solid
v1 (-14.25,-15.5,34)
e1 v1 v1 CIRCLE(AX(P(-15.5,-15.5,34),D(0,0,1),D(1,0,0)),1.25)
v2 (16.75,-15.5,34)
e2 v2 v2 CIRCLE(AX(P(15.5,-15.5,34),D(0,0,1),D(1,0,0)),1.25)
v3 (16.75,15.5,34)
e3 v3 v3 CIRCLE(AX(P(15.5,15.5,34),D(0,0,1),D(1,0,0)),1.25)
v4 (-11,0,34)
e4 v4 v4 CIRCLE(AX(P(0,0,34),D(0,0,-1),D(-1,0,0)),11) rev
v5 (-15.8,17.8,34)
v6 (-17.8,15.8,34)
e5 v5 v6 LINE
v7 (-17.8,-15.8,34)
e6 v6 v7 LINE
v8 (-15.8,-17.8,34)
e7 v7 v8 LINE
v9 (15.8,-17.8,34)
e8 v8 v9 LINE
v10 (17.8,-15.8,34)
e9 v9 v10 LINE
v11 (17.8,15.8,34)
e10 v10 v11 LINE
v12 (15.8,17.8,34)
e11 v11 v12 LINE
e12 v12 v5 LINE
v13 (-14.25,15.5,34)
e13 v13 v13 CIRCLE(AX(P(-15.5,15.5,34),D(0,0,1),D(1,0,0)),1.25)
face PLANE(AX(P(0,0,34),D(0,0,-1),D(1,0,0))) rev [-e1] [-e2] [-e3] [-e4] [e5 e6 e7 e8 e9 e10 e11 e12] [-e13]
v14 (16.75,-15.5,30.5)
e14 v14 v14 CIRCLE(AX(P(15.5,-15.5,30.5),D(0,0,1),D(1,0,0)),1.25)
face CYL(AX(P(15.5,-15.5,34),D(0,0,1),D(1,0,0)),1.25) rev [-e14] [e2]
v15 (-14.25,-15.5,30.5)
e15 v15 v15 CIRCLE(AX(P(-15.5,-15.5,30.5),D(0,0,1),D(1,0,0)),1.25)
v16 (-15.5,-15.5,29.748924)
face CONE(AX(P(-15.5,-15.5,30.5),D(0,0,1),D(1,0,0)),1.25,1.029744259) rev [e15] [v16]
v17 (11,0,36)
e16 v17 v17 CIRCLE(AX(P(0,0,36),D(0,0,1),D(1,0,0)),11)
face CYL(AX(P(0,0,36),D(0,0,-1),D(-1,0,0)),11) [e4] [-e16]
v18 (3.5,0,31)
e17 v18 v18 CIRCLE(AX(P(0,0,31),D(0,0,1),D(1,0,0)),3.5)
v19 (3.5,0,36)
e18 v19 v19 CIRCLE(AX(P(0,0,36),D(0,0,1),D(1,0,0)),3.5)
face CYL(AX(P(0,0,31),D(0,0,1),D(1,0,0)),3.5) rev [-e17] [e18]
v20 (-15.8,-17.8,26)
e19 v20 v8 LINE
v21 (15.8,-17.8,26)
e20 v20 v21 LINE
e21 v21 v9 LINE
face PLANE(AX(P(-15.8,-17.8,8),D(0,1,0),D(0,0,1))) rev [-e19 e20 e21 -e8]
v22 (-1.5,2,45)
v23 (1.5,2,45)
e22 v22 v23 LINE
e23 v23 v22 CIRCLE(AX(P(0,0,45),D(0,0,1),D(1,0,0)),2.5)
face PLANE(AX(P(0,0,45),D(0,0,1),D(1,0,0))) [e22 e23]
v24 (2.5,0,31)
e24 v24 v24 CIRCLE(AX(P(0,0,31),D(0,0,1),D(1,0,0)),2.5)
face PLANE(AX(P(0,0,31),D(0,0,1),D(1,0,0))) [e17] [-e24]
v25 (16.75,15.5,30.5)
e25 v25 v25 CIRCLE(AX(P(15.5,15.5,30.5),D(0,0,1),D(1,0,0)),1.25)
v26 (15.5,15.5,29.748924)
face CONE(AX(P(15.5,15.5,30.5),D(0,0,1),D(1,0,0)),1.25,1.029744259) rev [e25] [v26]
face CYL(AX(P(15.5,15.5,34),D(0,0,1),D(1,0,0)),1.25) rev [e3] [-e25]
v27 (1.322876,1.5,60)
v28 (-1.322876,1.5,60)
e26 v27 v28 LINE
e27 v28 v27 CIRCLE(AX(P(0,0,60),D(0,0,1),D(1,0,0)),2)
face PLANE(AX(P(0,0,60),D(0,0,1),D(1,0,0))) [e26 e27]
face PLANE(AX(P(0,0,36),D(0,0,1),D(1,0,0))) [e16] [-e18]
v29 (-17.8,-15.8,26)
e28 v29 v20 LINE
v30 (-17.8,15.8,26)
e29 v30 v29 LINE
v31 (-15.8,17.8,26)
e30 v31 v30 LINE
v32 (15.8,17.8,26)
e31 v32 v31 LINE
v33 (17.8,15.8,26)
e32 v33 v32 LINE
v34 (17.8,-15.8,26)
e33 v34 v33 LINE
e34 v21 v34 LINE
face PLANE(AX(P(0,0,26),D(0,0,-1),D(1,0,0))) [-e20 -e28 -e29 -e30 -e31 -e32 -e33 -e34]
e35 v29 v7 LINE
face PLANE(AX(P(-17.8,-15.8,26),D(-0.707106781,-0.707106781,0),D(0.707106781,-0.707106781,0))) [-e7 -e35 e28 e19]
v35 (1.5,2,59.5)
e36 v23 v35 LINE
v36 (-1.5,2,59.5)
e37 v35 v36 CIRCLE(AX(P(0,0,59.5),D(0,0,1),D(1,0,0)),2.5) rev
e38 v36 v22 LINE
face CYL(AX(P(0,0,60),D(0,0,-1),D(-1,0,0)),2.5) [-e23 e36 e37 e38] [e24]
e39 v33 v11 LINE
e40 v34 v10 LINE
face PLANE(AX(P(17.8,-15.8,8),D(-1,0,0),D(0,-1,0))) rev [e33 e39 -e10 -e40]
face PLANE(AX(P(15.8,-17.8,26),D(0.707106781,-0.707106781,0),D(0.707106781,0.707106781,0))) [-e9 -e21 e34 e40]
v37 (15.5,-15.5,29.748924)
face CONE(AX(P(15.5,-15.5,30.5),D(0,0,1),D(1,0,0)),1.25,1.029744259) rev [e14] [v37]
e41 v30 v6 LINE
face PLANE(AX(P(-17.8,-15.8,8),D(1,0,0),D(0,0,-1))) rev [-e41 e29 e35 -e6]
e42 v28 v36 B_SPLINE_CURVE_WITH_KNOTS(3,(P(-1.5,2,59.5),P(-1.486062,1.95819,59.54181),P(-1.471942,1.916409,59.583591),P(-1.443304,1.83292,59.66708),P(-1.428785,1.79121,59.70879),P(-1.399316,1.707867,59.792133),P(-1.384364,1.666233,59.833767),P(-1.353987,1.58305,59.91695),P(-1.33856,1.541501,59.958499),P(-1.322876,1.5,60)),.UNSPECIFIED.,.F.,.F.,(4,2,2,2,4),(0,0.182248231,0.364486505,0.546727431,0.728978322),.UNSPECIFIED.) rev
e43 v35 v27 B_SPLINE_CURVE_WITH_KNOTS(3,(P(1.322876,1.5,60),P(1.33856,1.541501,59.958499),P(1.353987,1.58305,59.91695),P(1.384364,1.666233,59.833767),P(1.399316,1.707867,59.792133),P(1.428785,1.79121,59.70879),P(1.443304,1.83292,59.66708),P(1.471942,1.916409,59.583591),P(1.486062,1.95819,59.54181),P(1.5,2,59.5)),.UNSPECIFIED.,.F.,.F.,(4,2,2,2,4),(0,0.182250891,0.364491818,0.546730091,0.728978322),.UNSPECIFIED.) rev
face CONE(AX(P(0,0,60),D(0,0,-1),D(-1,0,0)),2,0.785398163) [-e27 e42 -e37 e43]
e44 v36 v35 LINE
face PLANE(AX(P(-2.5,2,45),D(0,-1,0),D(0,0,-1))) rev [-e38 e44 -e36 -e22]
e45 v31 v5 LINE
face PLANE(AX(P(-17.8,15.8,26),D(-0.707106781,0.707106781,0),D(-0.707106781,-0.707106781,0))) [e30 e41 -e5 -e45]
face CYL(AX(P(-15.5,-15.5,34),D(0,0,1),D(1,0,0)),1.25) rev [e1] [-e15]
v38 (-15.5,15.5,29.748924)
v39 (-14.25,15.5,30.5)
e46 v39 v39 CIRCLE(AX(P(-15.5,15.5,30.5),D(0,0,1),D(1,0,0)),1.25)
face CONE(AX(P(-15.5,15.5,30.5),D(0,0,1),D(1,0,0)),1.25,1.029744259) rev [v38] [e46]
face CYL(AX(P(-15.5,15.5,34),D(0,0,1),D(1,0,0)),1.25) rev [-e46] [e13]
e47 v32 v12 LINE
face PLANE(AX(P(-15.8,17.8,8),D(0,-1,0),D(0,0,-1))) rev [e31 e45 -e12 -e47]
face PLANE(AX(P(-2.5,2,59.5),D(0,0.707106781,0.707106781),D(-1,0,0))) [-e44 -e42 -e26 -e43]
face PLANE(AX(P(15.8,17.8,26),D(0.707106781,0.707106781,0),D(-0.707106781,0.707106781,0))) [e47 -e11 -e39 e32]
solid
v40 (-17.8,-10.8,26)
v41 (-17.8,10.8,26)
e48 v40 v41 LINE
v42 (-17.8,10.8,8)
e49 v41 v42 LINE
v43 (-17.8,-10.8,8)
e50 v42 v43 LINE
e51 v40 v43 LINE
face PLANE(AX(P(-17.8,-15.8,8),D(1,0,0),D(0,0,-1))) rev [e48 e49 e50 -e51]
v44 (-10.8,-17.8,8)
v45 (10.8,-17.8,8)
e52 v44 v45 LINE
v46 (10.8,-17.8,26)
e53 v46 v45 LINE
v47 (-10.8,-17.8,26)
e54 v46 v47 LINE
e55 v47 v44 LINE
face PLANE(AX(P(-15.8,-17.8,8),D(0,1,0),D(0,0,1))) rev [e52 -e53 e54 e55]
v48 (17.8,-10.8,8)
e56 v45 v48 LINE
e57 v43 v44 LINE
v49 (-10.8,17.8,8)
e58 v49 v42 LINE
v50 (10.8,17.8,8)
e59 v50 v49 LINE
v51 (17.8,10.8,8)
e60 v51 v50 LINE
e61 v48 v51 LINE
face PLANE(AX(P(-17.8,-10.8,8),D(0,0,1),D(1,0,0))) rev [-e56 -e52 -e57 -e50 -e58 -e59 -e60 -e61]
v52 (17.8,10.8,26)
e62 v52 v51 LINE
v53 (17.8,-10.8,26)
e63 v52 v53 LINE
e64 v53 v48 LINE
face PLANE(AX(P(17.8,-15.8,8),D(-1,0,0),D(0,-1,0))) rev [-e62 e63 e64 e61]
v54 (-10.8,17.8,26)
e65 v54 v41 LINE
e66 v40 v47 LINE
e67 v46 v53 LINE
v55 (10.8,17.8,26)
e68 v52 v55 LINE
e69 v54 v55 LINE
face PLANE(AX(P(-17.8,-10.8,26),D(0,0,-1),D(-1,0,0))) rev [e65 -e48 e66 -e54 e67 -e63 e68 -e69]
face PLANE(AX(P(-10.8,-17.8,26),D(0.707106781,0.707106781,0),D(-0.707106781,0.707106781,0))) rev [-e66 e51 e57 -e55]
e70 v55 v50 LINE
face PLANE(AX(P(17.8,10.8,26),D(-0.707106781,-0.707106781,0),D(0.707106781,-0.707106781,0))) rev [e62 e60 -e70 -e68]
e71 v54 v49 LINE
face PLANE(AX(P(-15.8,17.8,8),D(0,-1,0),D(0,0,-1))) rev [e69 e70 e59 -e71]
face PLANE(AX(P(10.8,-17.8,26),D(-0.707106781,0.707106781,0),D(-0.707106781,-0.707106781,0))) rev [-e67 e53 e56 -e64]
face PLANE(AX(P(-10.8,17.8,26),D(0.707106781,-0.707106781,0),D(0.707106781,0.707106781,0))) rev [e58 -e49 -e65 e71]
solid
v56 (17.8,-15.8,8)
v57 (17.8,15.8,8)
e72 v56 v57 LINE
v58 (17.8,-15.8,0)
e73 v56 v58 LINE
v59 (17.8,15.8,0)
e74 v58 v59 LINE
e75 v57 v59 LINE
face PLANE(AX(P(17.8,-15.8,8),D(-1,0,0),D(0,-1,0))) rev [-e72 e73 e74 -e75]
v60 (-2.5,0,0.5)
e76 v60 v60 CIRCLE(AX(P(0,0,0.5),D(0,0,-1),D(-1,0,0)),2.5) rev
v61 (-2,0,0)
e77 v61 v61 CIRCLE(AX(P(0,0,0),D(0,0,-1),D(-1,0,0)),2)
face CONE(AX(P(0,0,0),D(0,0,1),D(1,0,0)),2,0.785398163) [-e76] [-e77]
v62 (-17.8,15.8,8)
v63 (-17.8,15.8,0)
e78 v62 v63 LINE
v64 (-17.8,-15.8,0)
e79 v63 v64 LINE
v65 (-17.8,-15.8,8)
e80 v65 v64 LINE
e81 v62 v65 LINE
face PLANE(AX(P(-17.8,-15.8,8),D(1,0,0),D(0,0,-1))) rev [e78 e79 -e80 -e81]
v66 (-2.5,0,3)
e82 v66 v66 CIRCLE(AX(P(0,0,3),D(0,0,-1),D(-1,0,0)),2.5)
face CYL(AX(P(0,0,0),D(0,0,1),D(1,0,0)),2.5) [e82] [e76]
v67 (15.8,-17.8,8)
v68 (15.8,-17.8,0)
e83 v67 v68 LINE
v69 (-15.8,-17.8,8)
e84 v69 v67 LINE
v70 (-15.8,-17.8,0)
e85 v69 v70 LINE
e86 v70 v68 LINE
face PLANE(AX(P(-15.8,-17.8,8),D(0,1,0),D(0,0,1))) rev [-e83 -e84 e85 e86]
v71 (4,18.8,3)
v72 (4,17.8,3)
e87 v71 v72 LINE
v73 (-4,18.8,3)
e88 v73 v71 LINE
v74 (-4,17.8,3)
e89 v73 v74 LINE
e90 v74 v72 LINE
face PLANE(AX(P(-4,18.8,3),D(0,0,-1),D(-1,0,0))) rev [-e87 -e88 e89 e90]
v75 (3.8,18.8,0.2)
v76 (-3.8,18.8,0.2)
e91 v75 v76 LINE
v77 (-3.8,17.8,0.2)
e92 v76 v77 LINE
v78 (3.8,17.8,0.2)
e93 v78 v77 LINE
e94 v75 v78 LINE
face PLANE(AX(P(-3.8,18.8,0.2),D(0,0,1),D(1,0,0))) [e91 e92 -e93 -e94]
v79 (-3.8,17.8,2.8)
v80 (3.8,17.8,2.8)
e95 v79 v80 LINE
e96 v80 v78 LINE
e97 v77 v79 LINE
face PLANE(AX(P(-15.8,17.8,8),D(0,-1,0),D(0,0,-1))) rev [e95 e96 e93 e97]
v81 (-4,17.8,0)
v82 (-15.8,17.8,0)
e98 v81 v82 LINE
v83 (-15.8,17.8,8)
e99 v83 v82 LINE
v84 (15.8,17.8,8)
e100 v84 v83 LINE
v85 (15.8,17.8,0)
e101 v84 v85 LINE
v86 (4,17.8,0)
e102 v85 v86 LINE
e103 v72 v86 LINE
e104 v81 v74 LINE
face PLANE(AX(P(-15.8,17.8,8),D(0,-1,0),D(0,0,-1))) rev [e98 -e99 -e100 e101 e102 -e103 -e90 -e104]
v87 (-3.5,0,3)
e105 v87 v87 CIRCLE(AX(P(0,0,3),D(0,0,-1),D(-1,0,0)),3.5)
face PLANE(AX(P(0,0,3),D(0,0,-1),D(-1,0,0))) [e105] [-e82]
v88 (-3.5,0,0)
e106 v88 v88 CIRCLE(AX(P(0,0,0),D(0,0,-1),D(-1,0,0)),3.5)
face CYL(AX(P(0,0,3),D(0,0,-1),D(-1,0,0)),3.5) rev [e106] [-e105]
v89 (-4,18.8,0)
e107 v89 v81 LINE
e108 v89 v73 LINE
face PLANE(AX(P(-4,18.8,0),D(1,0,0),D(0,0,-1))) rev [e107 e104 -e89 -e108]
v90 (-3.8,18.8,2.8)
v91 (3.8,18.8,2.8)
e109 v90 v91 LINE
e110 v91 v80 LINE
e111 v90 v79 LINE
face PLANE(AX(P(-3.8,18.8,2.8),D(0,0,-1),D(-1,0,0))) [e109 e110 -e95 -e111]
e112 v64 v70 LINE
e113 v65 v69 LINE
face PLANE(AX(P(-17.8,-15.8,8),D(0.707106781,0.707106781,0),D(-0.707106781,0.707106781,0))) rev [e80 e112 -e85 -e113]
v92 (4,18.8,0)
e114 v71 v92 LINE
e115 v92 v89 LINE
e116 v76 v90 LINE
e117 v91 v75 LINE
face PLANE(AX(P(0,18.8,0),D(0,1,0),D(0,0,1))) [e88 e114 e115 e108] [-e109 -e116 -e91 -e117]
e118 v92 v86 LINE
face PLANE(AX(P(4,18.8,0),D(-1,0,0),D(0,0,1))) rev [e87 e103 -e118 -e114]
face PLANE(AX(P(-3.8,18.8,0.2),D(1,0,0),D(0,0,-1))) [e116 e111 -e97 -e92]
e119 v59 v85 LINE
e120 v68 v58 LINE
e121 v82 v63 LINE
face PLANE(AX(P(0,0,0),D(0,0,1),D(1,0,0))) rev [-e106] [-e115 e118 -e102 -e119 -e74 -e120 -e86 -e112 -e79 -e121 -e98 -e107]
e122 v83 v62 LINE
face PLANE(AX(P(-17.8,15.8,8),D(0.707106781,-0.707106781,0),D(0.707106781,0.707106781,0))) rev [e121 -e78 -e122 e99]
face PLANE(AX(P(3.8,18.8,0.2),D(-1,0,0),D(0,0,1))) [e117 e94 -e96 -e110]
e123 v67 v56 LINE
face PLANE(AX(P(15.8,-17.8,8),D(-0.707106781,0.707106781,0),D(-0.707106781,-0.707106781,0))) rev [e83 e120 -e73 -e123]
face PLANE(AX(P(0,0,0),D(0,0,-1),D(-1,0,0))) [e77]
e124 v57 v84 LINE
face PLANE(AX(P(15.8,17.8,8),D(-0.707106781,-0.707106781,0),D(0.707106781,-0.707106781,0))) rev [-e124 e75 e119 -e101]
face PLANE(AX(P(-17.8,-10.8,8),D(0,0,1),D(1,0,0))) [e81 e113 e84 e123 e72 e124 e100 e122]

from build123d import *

# Parameters (mm, degrees)
BOSS_EXTRUDE1_DEPTH         = 8
BOSS_EXTRUDE2_DEPTH         = 18
TAP_DRILL_FOR_M3_TAP1_D     = 2.5
TAP_DRILL_FOR_M3_TAP1_DEPTH = 3.5
TAP_DRILL_FOR_M3_TAP1_TIP   = 0.751075774
SKETCH6_R                   = 11
BOSS_EXTRUDE3_DEPTH         = 2
SKETCH7_R                   = 3.5
CUT_EXTRUDE1_DEPTH          = 5
SKETCH8_R                   = 2.5
BOSS_EXTRUDE4_DEPTH         = 29
SKETCH9_W                   = 5
SKETCH9_H                   = 2
CUT_EXTRUDE2_DEPTH          = 15
CHAMFER1_SIZE               = 0.5
CUT_EXTRUDE3_START          = -3
SKETCH10_R                  = 3.5
CUT_EXTRUDE3_DEPTH          = 3
BOSS_EXTRUDE5_START         = 3
SKETCH11_R                  = 2.5
BOSS_EXTRUDE5_DEPTH         = 3
CHAMFER2_SIZE               = 0.5
SKETCH12_W                  = 8
SKETCH12_H                  = 3
SKETCH12_W_2                = 7.6
SKETCH12_H_2                = 2.6
BOSS_EXTRUDE6_DEPTH         = 1
SPLIT1_START                = 8
SPLIT1_DEPTH                = 52
SPLIT1_2_DEPTH              = 18
SPLIT1_START_2              = 26
SPLIT1_3_OUTLINE_R          = 3.5
SPLIT1_3_OUTLINE_R_2        = 1.25
SPLIT1_3_OUTLINE_R_3        = 2.5
SPLIT1_3_DEPTH              = 8
SPLIT1_START_3              = 34
SPLIT1_4_OUTLINE_R          = 11
SPLIT1_4_OUTLINE_R_2        = 3.5
SPLIT1_4_OUTLINE_R_3        = 2.5
SPLIT1_4_DEPTH              = 2
SPLIT1_START_4              = 36
SPLIT1_5_DEPTH              = 24
SPLIT1_6_OUTLINE_R          = 1.25
SPLIT1_6_OUTLINE_R_2        = 3.5
SPLIT1_6_OUTLINE_R_3        = 2.5
SPLIT1_6_DEPTH              = 4.4999999
SPLIT1_START_5              = 29.748924126
SPLIT1_7_OUTLINE_R          = 3.5
SPLIT1_7_OUTLINE_R_2        = 2.5
SPLIT1_7_DEPTH              = 1.251075874
SPLIT1_8_DEPTH              = 9
SPLIT1_START_6              = 43.487067043
SPLIT1_10_OUTLINE_W         = 6
SPLIT1_10_OUTLINE_H         = 4
SPLIT1_10_DEPTH             = 1.512932957


with BuildPart() as part:
    # Sketch1 → Boss-Extrude1 (new body)
    with BuildSketch(Plane.XY):
        Polygon((-17.8, 15.8), (-15.8, 17.8), (15.8, 17.8), (17.8, 15.8), (17.8, -15.8), (15.8, -17.8), (-15.8, -17.8), (-17.8, -15.8), align=None)
    boss_extrude1 = extrude(amount=BOSS_EXTRUDE1_DEPTH)

    # Sketch2 → Boss-Extrude2 (add)
    with BuildSketch(Plane.XY.offset(8)):
        Polygon((10.8, -17.8), (-10.8, -17.8), (-17.8, -10.8), (-17.8, 10.8), (-10.8, 17.8), (10.8, 17.8), (17.8, 10.8), (17.8, -10.8), align=None)
    extrude(amount=BOSS_EXTRUDE2_DEPTH)

    # Mirror1: Boss-Extrude1 across plane
    add(boss_extrude1.mirror(Plane.XY.offset(17)))

    # Tap Drill for M3 Tap1
    with Locations(Plane.XY.offset(34)):
        with Locations((-15.5, 15.5), (15.5, 15.5), (15.5, -15.5), (-15.5, -15.5)):
            Hole(TAP_DRILL_FOR_M3_TAP1_D / 2, depth=TAP_DRILL_FOR_M3_TAP1_DEPTH)
            with Locations((0, 0, -(TAP_DRILL_FOR_M3_TAP1_DEPTH + TAP_DRILL_FOR_M3_TAP1_TIP / 2))):  # 118° drill point
                Cone(0, TAP_DRILL_FOR_M3_TAP1_D / 2, TAP_DRILL_FOR_M3_TAP1_TIP, mode=Mode.SUBTRACT)

    # Sketch6 → Boss-Extrude3 (add)
    with BuildSketch(Plane.XY.offset(34)):
        with Locations(Location((0, 0, 0), (0, 0, 180))):
            Circle(SKETCH6_R)
    extrude(amount=BOSS_EXTRUDE3_DEPTH)

    # Sketch7 → Cut-Extrude1 (cut)
    with BuildSketch(Plane.XY.offset(36)):
        Circle(SKETCH7_R)
    extrude(amount=-CUT_EXTRUDE1_DEPTH, mode=Mode.SUBTRACT)

    # Sketch8 → Boss-Extrude4 (add)
    with BuildSketch(Plane.XY.offset(31)):
        with Locations(Location((0, 0, 0), (0, 0, 180))):
            Circle(SKETCH8_R)
    extrude(amount=BOSS_EXTRUDE4_DEPTH)

    # Sketch9 → Cut-Extrude2 (cut)
    with BuildSketch(Plane.XY.offset(60)):
        with Locations((0, 3)):
            Rectangle(SKETCH9_W, SKETCH9_H)
    extrude(amount=-CUT_EXTRUDE2_DEPTH, mode=Mode.SUBTRACT)

    # Chamfer1
    chamfer1_edges = [part.edges().sort_by_distance(p)[0] for p in [
        (1.118033989, -2.236067977, 60),
        (0, 2, 60),
    ]]
    chamfer(chamfer1_edges, length=CHAMFER1_SIZE - 0.0001)  # a hair under: the kernel refuses the full size

    # Sketch10 → Cut-Extrude3 (cut)
    with BuildSketch(Plane(origin=(0, 0, 0), x_dir=(-1, 0, 0), z_dir=(0, 0, -1)).offset(CUT_EXTRUDE3_START)):
        with Locations(Location((0, 0, 0), (0, 0, 180))):
            Circle(SKETCH10_R)
    extrude(amount=CUT_EXTRUDE3_DEPTH, mode=Mode.SUBTRACT)

    # Sketch11 → Boss-Extrude5 (add)
    with BuildSketch(Plane(origin=(0, 0, 3), x_dir=(-1, 0, 0), z_dir=(0, 0, -1)).offset(BOSS_EXTRUDE5_START)):
        with Locations(Location((0, 0, 0), (0, 0, 53.130102354))):
            Circle(SKETCH11_R)
    extrude(amount=-BOSS_EXTRUDE5_DEPTH)

    # Chamfer2
    chamfer2_edges = [part.edges().sort_by_distance(p)[0] for p in [
        (1.5, -2, 0),
    ]]
    chamfer(chamfer2_edges, length=CHAMFER2_SIZE)

    # Sketch12 → Boss-Extrude6 (add)
    with BuildSketch(Plane(origin=(0, 17.8, 0), x_dir=(1, 0, 0), z_dir=(0, 1, 0))):
        with Locations((0, -1.5)):
            Rectangle(SKETCH12_W, SKETCH12_H)
        with Locations((0, -1.5)):
            Rectangle(SKETCH12_W_2, SKETCH12_H_2, mode=Mode.SUBTRACT)
    extrude(amount=BOSS_EXTRUDE6_DEPTH)

    # Split1: read off the stored shape, not the designer's step
    # Split1 outline → Split1 (cut)
    with BuildSketch(Plane.XY.offset(SPLIT1_START)):
        Polygon((-15.8, 17.8), (-17.8, 15.8), (-17.8, -15.8), (-15.8, -17.8), (15.8, -17.8), (17.8, -15.8), (17.8, 15.8), (15.8, 17.8), align=None)
    extrude(amount=SPLIT1_DEPTH, mode=Mode.SUBTRACT)


with BuildPart() as body_2:
    # Split1 2 outline → Split1 2 (new body)
    with BuildSketch(Plane.XY.offset(SPLIT1_START)):
        Polygon((-17.8, 10.8), (-17.8, -10.8), (-10.8, -17.8), (10.8, -17.8), (17.8, -10.8), (17.8, 10.8), (10.8, 17.8), (-10.8, 17.8), align=None)
    extrude(amount=SPLIT1_2_DEPTH)


with BuildPart() as body_3:
    # Split1 3 outline → Split1 3 (new body)
    # profile 1 of 2: a face of its own
    with BuildSketch(Plane.XY.offset(SPLIT1_START_2)):
        Polygon((-15.8, -17.8), (15.8, -17.8), (17.8, -15.8), (17.8, 15.8), (15.8, 17.8), (-15.8, 17.8), (-17.8, 15.8), (-17.8, -15.8), align=None)
        Circle(SPLIT1_3_OUTLINE_R, mode=Mode.SUBTRACT)
        with Locations((-15.5, -15.5)):
            Circle(SPLIT1_3_OUTLINE_R_2, mode=Mode.SUBTRACT)
        with Locations((15.5, -15.5)):
            Circle(SPLIT1_3_OUTLINE_R_2, mode=Mode.SUBTRACT)
        with Locations((-15.5, 15.5)):
            Circle(SPLIT1_3_OUTLINE_R_2, mode=Mode.SUBTRACT)
        with Locations((15.5, 15.5)):
            Circle(SPLIT1_3_OUTLINE_R_2, mode=Mode.SUBTRACT)
    # profile 2 of 2: a face of its own
    with BuildSketch(Plane.XY.offset(SPLIT1_START_2)):
        Circle(SPLIT1_3_OUTLINE_R_3)
    extrude(amount=SPLIT1_3_DEPTH)

    # Split1 4 outline → Split1 4 (add)
    # profile 1 of 2: a face of its own
    with BuildSketch(Plane.XY.offset(SPLIT1_START_3)):
        Circle(SPLIT1_4_OUTLINE_R)
        Circle(SPLIT1_4_OUTLINE_R_2, mode=Mode.SUBTRACT)
    # profile 2 of 2: a face of its own
    with BuildSketch(Plane.XY.offset(SPLIT1_START_3)):
        Circle(SPLIT1_4_OUTLINE_R_3)
    extrude(amount=SPLIT1_4_DEPTH)

    # Split1 5 outline → Split1 5 (add)
    with BuildSketch(Plane.XY.offset(SPLIT1_START_4)):
        with BuildLine():
            Line((1.5, 2), (-1.5, 2))
            ThreePointArc((-1.5, 2), (0, -2.5), (1.5, 2))
        make_face()
    extrude(amount=SPLIT1_5_DEPTH)

    # Split1 6 outline → Split1 6 (add)
    # profile 1 of 5: a face of its own
    with BuildSketch(Plane.XY.offset(SPLIT1_START_2)):
        with Locations((-15.5, -15.5)):
            Circle(SPLIT1_6_OUTLINE_R)
    # profile 2 of 5: a face of its own
    with BuildSketch(Plane.XY.offset(SPLIT1_START_2)):
        with Locations((15.5, -15.5)):
            Circle(SPLIT1_6_OUTLINE_R)
    # profile 3 of 5: a face of its own
    with BuildSketch(Plane.XY.offset(SPLIT1_START_2)):
        with Locations((15.5, 15.5)):
            Circle(SPLIT1_6_OUTLINE_R)
    # profile 4 of 5: a face of its own
    with BuildSketch(Plane.XY.offset(SPLIT1_START_2)):
        with Locations((-15.5, 15.5)):
            Circle(SPLIT1_6_OUTLINE_R)
    # profile 5 of 5: a face of its own
    with BuildSketch(Plane.XY.offset(SPLIT1_START_2)):
        Circle(SPLIT1_6_OUTLINE_R_2)
        Circle(SPLIT1_6_OUTLINE_R_3, mode=Mode.SUBTRACT)
    extrude(amount=SPLIT1_6_DEPTH)

    # Split1 7 outline → Split1 7 (add)
    with BuildSketch(Plane.XY.offset(SPLIT1_START_5)):
        Circle(SPLIT1_7_OUTLINE_R)
        Circle(SPLIT1_7_OUTLINE_R_2, mode=Mode.SUBTRACT)
    extrude(amount=SPLIT1_7_DEPTH)

    # Split1 8 outline → Split1 8 (add)
    with BuildSketch(Plane.XY.offset(SPLIT1_START_4)):
        with BuildLine():
            ThreePointArc((1.5, 2), (0, 2.5), (-1.5, 2))
            Line((-1.5, 2), (1.5, 2))
        make_face()
    extrude(amount=SPLIT1_8_DEPTH)

    # Split1 9 outline → Split1 9 (revolve, cut)
    with BuildSketch(Plane.XZ):
        Polygon((2.5, 60), (2, 60), (2.5, 59.5), align=None)
    revolve(axis=Axis((0, 0, 0), (0, 0, 1)), mode=Mode.SUBTRACT)

    # Split1 10 outline → Split1 10 (cut)
    with BuildSketch(Plane(origin=(0, 0, 0), x_dir=(1, 0, 0), z_dir=(0, 0.707106781186543, 0.707106781186552)).offset(SPLIT1_START_6)):
        with Locations((0, -41)):
            Rectangle(SPLIT1_10_OUTLINE_W, SPLIT1_10_OUTLINE_H)
    extrude(amount=SPLIT1_10_DEPTH, mode=Mode.SUBTRACT)

    # Split1 11 outline → Split1 11 (revolve, cut)
    with BuildSketch(Plane(origin=(-15.5, -15.5, 0), x_dir=(1, 0, 0), z_dir=(0, -1, 0))):
        Polygon((0, 30.5), (0, 29.748924226), (1.25, 30.5), align=None)
    revolve(axis=Axis((-15.5, -15.5, 0), (0, 0, 1)), mode=Mode.SUBTRACT)

    # Split1 12 outline → Split1 12 (revolve, cut)
    with BuildSketch(Plane(origin=(15.5, -15.5, 0), x_dir=(1, 0, 0), z_dir=(0, -1, 0))):
        Polygon((0, 30.5), (0, 29.748924226), (1.25, 30.5), align=None)
    revolve(axis=Axis((15.5, -15.5, 0), (0, 0, 1)), mode=Mode.SUBTRACT)

    # Split1 13 outline → Split1 13 (revolve, cut)
    with BuildSketch(Plane(origin=(15.5, 15.5, 0), x_dir=(1, 0, 0), z_dir=(0, -1, 0))):
        Polygon((0, 30.5), (0, 29.748924226), (1.25, 30.5), align=None)
    revolve(axis=Axis((15.5, 15.5, 0), (0, 0, 1)), mode=Mode.SUBTRACT)

    # Split1 14 outline → Split1 14 (revolve, cut)
    with BuildSketch(Plane(origin=(-15.5, 15.5, 0), x_dir=(1, 0, 0), z_dir=(0, -1, 0))):
        Polygon((0, 30.5), (0, 29.748924226), (1.25, 30.5), align=None)
    revolve(axis=Axis((-15.5, 15.5, 0), (0, 0, 1)), mode=Mode.SUBTRACT)


solid = Compound([part.part, body_2.part, body_3.part])
